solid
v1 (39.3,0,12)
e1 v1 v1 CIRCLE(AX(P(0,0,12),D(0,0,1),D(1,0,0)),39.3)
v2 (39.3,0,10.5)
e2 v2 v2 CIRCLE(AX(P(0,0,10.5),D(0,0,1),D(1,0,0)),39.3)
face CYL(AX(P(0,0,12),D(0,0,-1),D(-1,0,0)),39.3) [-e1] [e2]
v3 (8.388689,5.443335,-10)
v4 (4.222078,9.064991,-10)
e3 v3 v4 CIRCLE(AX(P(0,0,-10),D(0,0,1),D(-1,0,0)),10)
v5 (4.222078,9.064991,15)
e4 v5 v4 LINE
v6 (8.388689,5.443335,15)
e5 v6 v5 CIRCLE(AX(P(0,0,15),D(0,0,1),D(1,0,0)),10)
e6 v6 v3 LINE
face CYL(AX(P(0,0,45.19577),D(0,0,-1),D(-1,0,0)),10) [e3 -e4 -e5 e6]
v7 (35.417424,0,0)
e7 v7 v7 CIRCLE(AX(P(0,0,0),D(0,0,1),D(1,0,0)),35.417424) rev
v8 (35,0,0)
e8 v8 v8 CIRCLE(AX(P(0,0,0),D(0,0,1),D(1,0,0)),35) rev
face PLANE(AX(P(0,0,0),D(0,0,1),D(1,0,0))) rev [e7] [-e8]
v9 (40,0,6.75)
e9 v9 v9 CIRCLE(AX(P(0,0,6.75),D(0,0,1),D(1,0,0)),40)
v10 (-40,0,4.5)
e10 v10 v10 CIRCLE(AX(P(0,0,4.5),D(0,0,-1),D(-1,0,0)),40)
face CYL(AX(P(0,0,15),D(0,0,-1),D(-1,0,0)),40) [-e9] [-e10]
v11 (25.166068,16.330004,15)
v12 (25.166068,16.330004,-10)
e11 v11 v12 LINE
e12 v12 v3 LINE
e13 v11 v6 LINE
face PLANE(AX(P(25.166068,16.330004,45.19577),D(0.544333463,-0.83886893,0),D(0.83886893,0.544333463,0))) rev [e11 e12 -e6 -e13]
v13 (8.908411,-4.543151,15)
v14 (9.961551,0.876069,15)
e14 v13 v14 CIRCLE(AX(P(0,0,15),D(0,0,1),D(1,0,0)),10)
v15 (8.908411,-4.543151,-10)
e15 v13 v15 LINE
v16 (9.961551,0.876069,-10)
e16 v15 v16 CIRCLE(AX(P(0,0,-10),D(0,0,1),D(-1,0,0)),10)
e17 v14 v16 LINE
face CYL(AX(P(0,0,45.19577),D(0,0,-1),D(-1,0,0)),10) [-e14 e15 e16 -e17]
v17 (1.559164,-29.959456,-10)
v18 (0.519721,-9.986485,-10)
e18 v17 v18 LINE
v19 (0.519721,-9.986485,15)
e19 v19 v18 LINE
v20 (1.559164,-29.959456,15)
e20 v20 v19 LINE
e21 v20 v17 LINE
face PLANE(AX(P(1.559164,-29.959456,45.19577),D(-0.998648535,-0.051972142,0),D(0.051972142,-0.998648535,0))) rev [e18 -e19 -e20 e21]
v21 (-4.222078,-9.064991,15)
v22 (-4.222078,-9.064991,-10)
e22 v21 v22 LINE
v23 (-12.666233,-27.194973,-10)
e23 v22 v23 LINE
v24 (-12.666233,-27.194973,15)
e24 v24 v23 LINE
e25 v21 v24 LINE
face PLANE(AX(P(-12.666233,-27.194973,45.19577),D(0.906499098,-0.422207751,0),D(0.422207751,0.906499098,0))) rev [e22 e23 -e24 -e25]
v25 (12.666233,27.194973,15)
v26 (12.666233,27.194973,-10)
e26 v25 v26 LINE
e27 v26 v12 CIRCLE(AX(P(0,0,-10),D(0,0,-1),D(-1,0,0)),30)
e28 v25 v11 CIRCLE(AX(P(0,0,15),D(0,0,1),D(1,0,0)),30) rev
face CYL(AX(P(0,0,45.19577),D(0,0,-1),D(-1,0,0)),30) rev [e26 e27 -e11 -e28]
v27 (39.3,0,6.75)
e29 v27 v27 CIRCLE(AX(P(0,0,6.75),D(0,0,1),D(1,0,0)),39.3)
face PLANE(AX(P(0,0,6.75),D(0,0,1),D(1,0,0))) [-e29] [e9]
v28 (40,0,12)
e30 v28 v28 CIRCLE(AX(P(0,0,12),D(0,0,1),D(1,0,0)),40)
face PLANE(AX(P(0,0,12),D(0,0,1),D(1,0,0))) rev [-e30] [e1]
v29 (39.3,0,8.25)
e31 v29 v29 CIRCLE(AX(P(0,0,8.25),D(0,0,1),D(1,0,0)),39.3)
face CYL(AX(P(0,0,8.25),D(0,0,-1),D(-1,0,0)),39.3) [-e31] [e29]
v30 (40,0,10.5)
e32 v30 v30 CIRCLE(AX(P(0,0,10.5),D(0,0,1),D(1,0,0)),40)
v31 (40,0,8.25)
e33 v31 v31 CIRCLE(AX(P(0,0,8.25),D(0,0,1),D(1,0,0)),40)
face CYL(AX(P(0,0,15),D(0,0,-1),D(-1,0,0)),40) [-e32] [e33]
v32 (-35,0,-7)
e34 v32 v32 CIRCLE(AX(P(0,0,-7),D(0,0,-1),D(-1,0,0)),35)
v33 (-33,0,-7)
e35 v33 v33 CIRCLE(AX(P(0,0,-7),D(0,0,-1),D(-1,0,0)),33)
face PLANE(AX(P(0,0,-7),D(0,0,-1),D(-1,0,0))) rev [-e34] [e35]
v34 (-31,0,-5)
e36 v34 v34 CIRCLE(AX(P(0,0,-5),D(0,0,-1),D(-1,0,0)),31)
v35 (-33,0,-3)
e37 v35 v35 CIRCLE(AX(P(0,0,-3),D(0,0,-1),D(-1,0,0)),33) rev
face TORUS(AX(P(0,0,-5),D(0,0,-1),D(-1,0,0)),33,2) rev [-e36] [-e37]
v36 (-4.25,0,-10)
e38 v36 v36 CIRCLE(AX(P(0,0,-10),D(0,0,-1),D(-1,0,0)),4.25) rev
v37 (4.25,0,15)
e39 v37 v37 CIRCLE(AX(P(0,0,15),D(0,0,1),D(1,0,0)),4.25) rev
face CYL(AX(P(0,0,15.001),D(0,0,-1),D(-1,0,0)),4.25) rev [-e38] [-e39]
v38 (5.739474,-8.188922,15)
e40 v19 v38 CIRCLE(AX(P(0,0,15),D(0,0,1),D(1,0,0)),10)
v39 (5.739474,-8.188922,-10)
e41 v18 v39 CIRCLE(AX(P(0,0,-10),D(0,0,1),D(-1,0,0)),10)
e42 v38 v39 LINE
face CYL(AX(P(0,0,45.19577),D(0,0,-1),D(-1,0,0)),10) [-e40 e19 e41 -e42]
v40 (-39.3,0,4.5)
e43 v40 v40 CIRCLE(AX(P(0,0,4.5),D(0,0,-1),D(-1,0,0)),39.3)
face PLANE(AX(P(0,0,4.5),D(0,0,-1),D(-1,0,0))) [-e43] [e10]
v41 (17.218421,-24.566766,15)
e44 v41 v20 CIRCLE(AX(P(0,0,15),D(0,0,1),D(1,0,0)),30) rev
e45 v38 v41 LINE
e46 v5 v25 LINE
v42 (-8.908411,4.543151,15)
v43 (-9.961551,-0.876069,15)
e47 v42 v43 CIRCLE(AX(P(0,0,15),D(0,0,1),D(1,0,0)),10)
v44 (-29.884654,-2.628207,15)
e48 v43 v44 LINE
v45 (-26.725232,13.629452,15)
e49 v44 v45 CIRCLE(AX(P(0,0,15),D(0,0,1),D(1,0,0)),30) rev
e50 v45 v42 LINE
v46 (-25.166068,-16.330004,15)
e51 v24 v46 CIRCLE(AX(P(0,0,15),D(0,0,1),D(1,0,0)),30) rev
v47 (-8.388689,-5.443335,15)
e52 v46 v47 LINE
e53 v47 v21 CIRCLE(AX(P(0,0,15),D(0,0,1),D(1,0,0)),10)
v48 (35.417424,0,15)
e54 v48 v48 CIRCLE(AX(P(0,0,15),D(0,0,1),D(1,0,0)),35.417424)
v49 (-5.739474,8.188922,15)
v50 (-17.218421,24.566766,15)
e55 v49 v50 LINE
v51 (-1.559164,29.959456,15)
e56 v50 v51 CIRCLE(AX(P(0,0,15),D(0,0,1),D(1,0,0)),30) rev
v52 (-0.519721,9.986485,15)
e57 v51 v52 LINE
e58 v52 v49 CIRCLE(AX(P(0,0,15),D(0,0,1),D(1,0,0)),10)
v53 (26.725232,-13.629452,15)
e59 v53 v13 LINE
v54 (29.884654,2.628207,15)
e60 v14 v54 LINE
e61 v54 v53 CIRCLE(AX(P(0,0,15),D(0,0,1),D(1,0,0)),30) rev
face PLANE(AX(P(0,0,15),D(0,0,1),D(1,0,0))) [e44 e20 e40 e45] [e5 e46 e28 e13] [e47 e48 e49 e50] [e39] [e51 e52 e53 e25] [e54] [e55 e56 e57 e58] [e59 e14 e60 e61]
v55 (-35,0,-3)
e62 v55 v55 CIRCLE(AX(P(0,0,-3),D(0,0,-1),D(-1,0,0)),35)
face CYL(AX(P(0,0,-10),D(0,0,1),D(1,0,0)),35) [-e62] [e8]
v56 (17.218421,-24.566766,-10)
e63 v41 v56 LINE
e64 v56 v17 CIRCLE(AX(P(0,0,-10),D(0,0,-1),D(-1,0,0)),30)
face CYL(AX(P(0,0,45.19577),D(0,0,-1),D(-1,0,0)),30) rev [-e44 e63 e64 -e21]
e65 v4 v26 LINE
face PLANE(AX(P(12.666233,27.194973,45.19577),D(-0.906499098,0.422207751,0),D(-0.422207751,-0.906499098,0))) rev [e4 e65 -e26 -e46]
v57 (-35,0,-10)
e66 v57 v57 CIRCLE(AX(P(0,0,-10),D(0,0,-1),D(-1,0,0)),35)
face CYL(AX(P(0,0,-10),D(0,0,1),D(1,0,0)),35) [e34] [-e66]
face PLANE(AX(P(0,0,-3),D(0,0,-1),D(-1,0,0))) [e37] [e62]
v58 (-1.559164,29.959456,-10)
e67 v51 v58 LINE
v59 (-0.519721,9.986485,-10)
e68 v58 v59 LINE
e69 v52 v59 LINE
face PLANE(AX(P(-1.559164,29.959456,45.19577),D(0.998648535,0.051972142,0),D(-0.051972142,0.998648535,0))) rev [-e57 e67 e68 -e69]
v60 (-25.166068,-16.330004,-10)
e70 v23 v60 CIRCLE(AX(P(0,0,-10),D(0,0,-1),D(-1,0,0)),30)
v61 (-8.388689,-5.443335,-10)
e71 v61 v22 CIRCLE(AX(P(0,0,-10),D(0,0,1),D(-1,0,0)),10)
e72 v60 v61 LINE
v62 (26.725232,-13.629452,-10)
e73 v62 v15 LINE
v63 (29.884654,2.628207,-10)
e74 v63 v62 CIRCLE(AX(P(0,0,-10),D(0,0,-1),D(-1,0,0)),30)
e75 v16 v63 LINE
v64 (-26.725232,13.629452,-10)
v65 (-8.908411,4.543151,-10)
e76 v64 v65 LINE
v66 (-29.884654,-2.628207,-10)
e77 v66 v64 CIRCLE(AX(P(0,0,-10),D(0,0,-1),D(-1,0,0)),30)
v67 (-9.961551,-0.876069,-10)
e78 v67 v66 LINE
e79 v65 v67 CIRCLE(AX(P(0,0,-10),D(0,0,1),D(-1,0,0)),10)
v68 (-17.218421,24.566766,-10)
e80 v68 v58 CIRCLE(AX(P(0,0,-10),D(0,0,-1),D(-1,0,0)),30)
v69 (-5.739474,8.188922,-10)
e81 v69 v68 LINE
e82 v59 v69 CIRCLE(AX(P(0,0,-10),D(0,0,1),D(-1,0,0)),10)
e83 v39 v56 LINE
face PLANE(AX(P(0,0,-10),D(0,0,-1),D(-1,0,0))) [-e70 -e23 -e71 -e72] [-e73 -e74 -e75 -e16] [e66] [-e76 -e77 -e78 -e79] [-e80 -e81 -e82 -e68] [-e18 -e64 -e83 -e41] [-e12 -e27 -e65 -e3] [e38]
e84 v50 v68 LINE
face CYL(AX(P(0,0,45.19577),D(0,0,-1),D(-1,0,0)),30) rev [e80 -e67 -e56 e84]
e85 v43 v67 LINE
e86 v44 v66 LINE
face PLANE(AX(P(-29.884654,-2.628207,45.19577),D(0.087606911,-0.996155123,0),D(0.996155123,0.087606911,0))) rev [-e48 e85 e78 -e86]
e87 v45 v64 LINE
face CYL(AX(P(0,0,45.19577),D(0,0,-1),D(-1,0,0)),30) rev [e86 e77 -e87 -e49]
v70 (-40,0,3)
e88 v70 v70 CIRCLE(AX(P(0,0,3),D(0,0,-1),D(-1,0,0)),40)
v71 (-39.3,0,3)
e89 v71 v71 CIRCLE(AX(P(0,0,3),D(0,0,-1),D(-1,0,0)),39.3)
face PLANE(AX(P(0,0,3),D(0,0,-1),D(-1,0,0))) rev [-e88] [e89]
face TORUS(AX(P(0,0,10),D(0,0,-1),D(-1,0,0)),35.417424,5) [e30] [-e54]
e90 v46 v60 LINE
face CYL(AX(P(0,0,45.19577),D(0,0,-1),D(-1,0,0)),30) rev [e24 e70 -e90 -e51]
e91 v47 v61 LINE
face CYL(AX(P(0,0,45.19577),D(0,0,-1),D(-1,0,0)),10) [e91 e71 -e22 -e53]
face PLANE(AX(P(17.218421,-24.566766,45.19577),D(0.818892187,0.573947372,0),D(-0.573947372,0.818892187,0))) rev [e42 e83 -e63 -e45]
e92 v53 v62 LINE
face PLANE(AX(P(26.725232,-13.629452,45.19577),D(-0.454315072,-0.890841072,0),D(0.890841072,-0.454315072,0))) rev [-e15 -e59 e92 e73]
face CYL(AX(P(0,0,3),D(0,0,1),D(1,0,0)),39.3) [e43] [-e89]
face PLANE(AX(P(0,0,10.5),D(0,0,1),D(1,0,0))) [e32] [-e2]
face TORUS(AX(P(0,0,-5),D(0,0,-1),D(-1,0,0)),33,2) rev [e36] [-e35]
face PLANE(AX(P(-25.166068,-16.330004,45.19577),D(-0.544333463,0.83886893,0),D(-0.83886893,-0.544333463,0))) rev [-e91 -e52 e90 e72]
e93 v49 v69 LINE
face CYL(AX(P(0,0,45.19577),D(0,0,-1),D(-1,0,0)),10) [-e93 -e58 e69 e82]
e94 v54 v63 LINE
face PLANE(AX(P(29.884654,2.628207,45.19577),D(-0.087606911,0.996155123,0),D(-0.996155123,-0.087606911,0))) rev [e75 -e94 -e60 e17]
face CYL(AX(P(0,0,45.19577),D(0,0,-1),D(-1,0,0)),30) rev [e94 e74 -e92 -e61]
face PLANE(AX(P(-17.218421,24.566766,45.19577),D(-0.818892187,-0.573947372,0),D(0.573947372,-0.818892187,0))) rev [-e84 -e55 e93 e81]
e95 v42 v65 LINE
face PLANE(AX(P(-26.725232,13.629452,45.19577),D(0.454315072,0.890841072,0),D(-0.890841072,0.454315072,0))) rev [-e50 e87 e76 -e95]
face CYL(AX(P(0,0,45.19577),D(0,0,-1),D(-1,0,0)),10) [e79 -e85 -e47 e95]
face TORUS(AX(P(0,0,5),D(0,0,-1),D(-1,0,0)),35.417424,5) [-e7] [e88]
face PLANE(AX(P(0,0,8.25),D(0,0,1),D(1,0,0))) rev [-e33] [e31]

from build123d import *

# Parameters (mm, degrees)
ESQUISSE1_R                   = 40
BOSS_EXTRU_1_DEPTH            = 15
ESQUISSE2_R                   = 9.65
ENL_V_MAT_EXTRU_1_DEPTH       = 10.5
ENL_V_MAT_EXTRU_2_REACH       = 59.535
ESQUISSE3_R                   = 4.25
ENL_V_MAT_EXTRU_4_DEPTH       = 0.75
ENL_V_MAT_EXTRU_4_DEPTH_BACK  = 0.75
ESQUISSE4_R                   = 40
ESQUISSE4_R_2                 = 39.3
ENL_V_MAT_EXTRU_5_DEPTH       = 0.75
ENL_V_MAT_EXTRU_5_DEPTH_BACK  = 0.75
ESQUISSE5_R                   = 40
ESQUISSE5_R_2                 = 39.3
ENL_V_MAT_EXTRU_6_DEPTH       = 0.75
ENL_V_MAT_EXTRU_6_DEPTH_BACK  = 0.75
ESQUISSE6_R                   = 40
ESQUISSE6_R_2                 = 39.3
CONG_1_R                      = 5
ESQUISSE12_R                  = 35
BOSS_EXTRU_8_DEPTH            = 10
BOSS_EXTRU_2_START            = 10.5
ESQUISSE8_R                   = 9.65
BOSS_EXTRU_2_DEPTH            = 10.5
ENL_V_START                   = -25
ESQUISSE13_R                  = 4.25
ENL_V_MAT_EXTRU_10_DEPTH      = 25
ENL_V_MAT_EXTRU_11_DEPTH      = 25
ENL_V_MAT_EXTRU_12_DEPTH      = 2
ENL_V_MAT_EXTRU_12_DEPTH_BACK = 2
ESQUISSE16_R                  = 35
ESQUISSE16_R_2                = 31
CONG_2_R                      = 2


# Some blends are built 0.0001 mm under size
with BuildPart() as part:
    # Esquisse1 → Boss.-Extru.1 (new body)
    with BuildSketch(Plane.XY):
        Circle(ESQUISSE1_R)
    extrude(amount=BOSS_EXTRU_1_DEPTH)

    # Esquisse2 → Enlèv. mat.-Extru.1 (cut)
    with BuildSketch(Plane(origin=(0, 0, 0), x_dir=(-1, 0, 0), z_dir=(0, 0, -1))):
        Circle(ESQUISSE2_R)
    extrude(amount=-ENL_V_MAT_EXTRU_1_DEPTH, mode=Mode.SUBTRACT)

    # Esquisse3 → Enlèv. mat.-Extru.2 (cut, up to next)
    with BuildSketch(Plane(origin=(0, 0, 10.5), x_dir=(-1, 0, 0), z_dir=(0, 0, -1)), mode=Mode.PRIVATE) as enl_v_mat_extru_2_sk1:
        Circle(ESQUISSE3_R)
    enl_v_mat_extru_2_tool1 = extrude(enl_v_mat_extru_2_sk1.sketch, amount=-ENL_V_MAT_EXTRU_2_REACH, mode=Mode.PRIVATE) & part.part
    add(enl_v_mat_extru_2_tool1.solids().sort_by_distance((0, 0, 10.5))[0], mode=Mode.SUBTRACT)

    # Esquisse4 → Enlèv. mat.-Extru.4 (cut, two sides: drawn at the far end of the back side and taken through both)
    with BuildSketch(Plane.XY.offset(7.5).offset(-ENL_V_MAT_EXTRU_4_DEPTH_BACK)):
        Circle(ESQUISSE4_R)
        Circle(ESQUISSE4_R_2, mode=Mode.SUBTRACT)
    extrude(amount=ENL_V_MAT_EXTRU_4_DEPTH + ENL_V_MAT_EXTRU_4_DEPTH_BACK, mode=Mode.SUBTRACT)

    # Esquisse5 → Enlèv. mat.-Extru.5 (cut, two sides: drawn at the far end of the back side and taken through both)
    with BuildSketch(Plane.XY.offset(11.25).offset(-ENL_V_MAT_EXTRU_5_DEPTH_BACK)):
        Circle(ESQUISSE5_R)
        Circle(ESQUISSE5_R_2, mode=Mode.SUBTRACT)
    extrude(amount=ENL_V_MAT_EXTRU_5_DEPTH + ENL_V_MAT_EXTRU_5_DEPTH_BACK, mode=Mode.SUBTRACT)

    # Esquisse6 → Enlèv. mat.-Extru.6 (cut, two sides: drawn at the far end of the back side and taken through both)
    with BuildSketch(Plane(origin=(0, 0, 3.75), x_dir=(-1, 0, 0), z_dir=(0, 0, -1)).offset(-ENL_V_MAT_EXTRU_6_DEPTH_BACK)):
        Circle(ESQUISSE6_R)
        with Locations(Location((0, 0, 0), (0, 0, 180))):
            Circle(ESQUISSE6_R_2, mode=Mode.SUBTRACT)
    extrude(amount=ENL_V_MAT_EXTRU_6_DEPTH + ENL_V_MAT_EXTRU_6_DEPTH_BACK, mode=Mode.SUBTRACT)

    # Congé1
    # the kernel refuses this fillet: 5 mm, written as the material it takes off along each edge
    with BuildSketch(Plane(origin=(0, 0, 0), x_dir=(1, 0, 0), z_dir=(0, -1, 0))) as cong_1_piece_1:
        with BuildLine():
            CenterArc((35.417424305, 5), CONG_1_R, 270, 66.421821522)
            Line((35.417424305, 0), (35.417424305, -0.1))
            Line((35.417424305, -0.1), (40, -0.1))
            Line((40, -0.1), (40.1, 0))
            ThreePointArc((40.1, 0), (40.1, 1.5), (40.091651514, 2.96))
            Line((40.091651514, 2.96), (40, 3))
        make_face()
    revolve(axis=Axis((0, 0, 0), (0, 0, 1)), mode=Mode.SUBTRACT)
    with BuildSketch(Plane(origin=(0, 0, 15), x_dir=(1, 0, 0), z_dir=(0, -1, 0))) as cong_1_piece_2:
        with BuildLine():
            CenterArc((35.417424305, -5), CONG_1_R, 23.578178478, 66.421821522)
            Line((35.417424305, 0), (35.417424305, 0.1))
            Line((35.417424305, 0.1), (40, 0.1))
            Line((40, 0.1), (40.1, 0))
            ThreePointArc((40.1, 0), (40.1, -1.5), (40.091651514, -2.96))
            Line((40.091651514, -2.96), (40, -3))
        make_face()
    revolve(axis=Axis((0, 0, 15), (0, 0, 1)), mode=Mode.SUBTRACT)

    # Esquisse12 → Boss.-Extru.8 (add)
    with BuildSketch(Plane(origin=(0, 0, 0), x_dir=(-1, 0, 0), z_dir=(0, 0, -1))):
        with Locations(Location((0, 0, 0), (0, 0, 180))):
            Circle(ESQUISSE12_R)
    extrude(amount=BOSS_EXTRU_8_DEPTH)

    # Esquisse8 → Boss.-Extru.2 (add)
    with BuildSketch(Plane(origin=(0, 0, 10.5), x_dir=(-1, 0, 0), z_dir=(0, 0, -1)).offset(BOSS_EXTRU_2_START)):
        Circle(ESQUISSE8_R)
    extrude(amount=-BOSS_EXTRU_2_DEPTH)

    # Esquisse13 → Enlèv. mat.-Extru.10 (cut)
    with BuildSketch(Plane.XY.offset(15).offset(ENL_V_START)):
        with Locations(Location((0, 0, 0), (0, 0, 180))):
            Circle(ESQUISSE13_R)
    extrude(amount=ENL_V_MAT_EXTRU_10_DEPTH, mode=Mode.SUBTRACT)

    # Esquisse15 → Enlèv. mat.-Extru.11 (cut)
    with BuildSketch(Plane(origin=(0, 0, -10), x_dir=(-1, 0, 0), z_dir=(0, 0, -1))):
        with BuildLine():
            Line((-1.559164269, -29.959456049), (-0.519721423, -9.98648535))
            ThreePointArc((-0.519721423, -9.98648535), (-3.256100362, -9.455041535), (-5.739473718, -8.188921873))
            Line((-5.739473718, -8.188921873), (-17.218421153, -24.566765619))
            ThreePointArc((-17.218421153, -24.566765619), (-9.768301085, -28.365124606), (-1.559164269, -29.959456049))
        make_face()
        with BuildLine():
            Line((-26.725232157, -13.629452159), (-8.908410719, -4.54315072))
            ThreePointArc((-8.908410719, -4.54315072), (-9.816356344, -1.907655137), (-9.961551231, 0.876069107))
            Line((-9.961551231, 0.876069107), (-29.884653692, 2.628207322))
            ThreePointArc((-29.884653692, 2.628207322), (-29.449069033, -5.722965411), (-26.725232157, -13.629452159))
        make_face()
        with BuildLine():
            Line((-25.166067888, 16.330003891), (-8.388689296, 5.44333463))
            ThreePointArc((-8.388689296, 5.44333463), (-6.560255983, 7.547386398), (-4.222077513, 9.06499098))
            Line((-4.222077513, 9.06499098), (-12.666232538, 27.194972941))
            ThreePointArc((-12.666232538, 27.194972941), (-19.680767948, 22.642159195), (-25.166067888, 16.330003891))
        make_face()
        with BuildLine():
            Line((1.559164269, 29.959456049), (0.519721423, 9.98648535))
            ThreePointArc((0.519721423, 9.98648535), (3.256100362, 9.455041535), (5.739473718, 8.188921873))
            Line((5.739473718, 8.188921873), (17.218421153, 24.566765619))
            ThreePointArc((17.218421153, 24.566765619), (9.768301085, 28.365124606), (1.559164269, 29.959456049))
        make_face()
        with BuildLine():
            Line((26.725232157, 13.629452159), (8.908410719, 4.54315072))
            ThreePointArc((8.908410719, 4.54315072), (9.816356344, 1.907655137), (9.961551231, -0.876069107))
            Line((9.961551231, -0.876069107), (29.884653692, -2.628207322))
            ThreePointArc((29.884653692, -2.628207322), (29.449069033, 5.722965411), (26.725232157, 13.629452159))
        make_face()
        with BuildLine():
            Line((25.166067888, -16.330003891), (8.388689296, -5.44333463))
            ThreePointArc((8.388689296, -5.44333463), (6.560255983, -7.547386398), (4.222077513, -9.06499098))
            Line((4.222077513, -9.06499098), (12.666232538, -27.194972941))
            ThreePointArc((12.666232538, -27.194972941), (19.680767948, -22.642159195), (25.166067888, -16.330003891))
        make_face()
    extrude(amount=-ENL_V_MAT_EXTRU_11_DEPTH, mode=Mode.SUBTRACT)

    # Esquisse16 → Enlèv. mat.-Extru.12 (cut, two sides: drawn at the far end of the back side and taken through both)
    with BuildSketch(Plane(origin=(0, 0, -5), x_dir=(-1, 0, 0), z_dir=(0, 0, -1)).offset(-ENL_V_MAT_EXTRU_12_DEPTH_BACK)):
        with Locations(Location((0, 0, 0), (0, 0, 180))):
            Circle(ESQUISSE16_R)
        Circle(ESQUISSE16_R_2, mode=Mode.SUBTRACT)
    extrude(amount=ENL_V_MAT_EXTRU_12_DEPTH + ENL_V_MAT_EXTRU_12_DEPTH_BACK, mode=Mode.SUBTRACT)

    # Congé2
    cong_2_edges = [part.edges().sort_by_distance(p)[0] for p in [
        (31, 0, -7),
        (31, 0, -3),
    ]]
    fillet(cong_2_edges, radius=CONG_2_R - 0.0001)  # a hair under: the kernel refuses the full size


solid = part.part
